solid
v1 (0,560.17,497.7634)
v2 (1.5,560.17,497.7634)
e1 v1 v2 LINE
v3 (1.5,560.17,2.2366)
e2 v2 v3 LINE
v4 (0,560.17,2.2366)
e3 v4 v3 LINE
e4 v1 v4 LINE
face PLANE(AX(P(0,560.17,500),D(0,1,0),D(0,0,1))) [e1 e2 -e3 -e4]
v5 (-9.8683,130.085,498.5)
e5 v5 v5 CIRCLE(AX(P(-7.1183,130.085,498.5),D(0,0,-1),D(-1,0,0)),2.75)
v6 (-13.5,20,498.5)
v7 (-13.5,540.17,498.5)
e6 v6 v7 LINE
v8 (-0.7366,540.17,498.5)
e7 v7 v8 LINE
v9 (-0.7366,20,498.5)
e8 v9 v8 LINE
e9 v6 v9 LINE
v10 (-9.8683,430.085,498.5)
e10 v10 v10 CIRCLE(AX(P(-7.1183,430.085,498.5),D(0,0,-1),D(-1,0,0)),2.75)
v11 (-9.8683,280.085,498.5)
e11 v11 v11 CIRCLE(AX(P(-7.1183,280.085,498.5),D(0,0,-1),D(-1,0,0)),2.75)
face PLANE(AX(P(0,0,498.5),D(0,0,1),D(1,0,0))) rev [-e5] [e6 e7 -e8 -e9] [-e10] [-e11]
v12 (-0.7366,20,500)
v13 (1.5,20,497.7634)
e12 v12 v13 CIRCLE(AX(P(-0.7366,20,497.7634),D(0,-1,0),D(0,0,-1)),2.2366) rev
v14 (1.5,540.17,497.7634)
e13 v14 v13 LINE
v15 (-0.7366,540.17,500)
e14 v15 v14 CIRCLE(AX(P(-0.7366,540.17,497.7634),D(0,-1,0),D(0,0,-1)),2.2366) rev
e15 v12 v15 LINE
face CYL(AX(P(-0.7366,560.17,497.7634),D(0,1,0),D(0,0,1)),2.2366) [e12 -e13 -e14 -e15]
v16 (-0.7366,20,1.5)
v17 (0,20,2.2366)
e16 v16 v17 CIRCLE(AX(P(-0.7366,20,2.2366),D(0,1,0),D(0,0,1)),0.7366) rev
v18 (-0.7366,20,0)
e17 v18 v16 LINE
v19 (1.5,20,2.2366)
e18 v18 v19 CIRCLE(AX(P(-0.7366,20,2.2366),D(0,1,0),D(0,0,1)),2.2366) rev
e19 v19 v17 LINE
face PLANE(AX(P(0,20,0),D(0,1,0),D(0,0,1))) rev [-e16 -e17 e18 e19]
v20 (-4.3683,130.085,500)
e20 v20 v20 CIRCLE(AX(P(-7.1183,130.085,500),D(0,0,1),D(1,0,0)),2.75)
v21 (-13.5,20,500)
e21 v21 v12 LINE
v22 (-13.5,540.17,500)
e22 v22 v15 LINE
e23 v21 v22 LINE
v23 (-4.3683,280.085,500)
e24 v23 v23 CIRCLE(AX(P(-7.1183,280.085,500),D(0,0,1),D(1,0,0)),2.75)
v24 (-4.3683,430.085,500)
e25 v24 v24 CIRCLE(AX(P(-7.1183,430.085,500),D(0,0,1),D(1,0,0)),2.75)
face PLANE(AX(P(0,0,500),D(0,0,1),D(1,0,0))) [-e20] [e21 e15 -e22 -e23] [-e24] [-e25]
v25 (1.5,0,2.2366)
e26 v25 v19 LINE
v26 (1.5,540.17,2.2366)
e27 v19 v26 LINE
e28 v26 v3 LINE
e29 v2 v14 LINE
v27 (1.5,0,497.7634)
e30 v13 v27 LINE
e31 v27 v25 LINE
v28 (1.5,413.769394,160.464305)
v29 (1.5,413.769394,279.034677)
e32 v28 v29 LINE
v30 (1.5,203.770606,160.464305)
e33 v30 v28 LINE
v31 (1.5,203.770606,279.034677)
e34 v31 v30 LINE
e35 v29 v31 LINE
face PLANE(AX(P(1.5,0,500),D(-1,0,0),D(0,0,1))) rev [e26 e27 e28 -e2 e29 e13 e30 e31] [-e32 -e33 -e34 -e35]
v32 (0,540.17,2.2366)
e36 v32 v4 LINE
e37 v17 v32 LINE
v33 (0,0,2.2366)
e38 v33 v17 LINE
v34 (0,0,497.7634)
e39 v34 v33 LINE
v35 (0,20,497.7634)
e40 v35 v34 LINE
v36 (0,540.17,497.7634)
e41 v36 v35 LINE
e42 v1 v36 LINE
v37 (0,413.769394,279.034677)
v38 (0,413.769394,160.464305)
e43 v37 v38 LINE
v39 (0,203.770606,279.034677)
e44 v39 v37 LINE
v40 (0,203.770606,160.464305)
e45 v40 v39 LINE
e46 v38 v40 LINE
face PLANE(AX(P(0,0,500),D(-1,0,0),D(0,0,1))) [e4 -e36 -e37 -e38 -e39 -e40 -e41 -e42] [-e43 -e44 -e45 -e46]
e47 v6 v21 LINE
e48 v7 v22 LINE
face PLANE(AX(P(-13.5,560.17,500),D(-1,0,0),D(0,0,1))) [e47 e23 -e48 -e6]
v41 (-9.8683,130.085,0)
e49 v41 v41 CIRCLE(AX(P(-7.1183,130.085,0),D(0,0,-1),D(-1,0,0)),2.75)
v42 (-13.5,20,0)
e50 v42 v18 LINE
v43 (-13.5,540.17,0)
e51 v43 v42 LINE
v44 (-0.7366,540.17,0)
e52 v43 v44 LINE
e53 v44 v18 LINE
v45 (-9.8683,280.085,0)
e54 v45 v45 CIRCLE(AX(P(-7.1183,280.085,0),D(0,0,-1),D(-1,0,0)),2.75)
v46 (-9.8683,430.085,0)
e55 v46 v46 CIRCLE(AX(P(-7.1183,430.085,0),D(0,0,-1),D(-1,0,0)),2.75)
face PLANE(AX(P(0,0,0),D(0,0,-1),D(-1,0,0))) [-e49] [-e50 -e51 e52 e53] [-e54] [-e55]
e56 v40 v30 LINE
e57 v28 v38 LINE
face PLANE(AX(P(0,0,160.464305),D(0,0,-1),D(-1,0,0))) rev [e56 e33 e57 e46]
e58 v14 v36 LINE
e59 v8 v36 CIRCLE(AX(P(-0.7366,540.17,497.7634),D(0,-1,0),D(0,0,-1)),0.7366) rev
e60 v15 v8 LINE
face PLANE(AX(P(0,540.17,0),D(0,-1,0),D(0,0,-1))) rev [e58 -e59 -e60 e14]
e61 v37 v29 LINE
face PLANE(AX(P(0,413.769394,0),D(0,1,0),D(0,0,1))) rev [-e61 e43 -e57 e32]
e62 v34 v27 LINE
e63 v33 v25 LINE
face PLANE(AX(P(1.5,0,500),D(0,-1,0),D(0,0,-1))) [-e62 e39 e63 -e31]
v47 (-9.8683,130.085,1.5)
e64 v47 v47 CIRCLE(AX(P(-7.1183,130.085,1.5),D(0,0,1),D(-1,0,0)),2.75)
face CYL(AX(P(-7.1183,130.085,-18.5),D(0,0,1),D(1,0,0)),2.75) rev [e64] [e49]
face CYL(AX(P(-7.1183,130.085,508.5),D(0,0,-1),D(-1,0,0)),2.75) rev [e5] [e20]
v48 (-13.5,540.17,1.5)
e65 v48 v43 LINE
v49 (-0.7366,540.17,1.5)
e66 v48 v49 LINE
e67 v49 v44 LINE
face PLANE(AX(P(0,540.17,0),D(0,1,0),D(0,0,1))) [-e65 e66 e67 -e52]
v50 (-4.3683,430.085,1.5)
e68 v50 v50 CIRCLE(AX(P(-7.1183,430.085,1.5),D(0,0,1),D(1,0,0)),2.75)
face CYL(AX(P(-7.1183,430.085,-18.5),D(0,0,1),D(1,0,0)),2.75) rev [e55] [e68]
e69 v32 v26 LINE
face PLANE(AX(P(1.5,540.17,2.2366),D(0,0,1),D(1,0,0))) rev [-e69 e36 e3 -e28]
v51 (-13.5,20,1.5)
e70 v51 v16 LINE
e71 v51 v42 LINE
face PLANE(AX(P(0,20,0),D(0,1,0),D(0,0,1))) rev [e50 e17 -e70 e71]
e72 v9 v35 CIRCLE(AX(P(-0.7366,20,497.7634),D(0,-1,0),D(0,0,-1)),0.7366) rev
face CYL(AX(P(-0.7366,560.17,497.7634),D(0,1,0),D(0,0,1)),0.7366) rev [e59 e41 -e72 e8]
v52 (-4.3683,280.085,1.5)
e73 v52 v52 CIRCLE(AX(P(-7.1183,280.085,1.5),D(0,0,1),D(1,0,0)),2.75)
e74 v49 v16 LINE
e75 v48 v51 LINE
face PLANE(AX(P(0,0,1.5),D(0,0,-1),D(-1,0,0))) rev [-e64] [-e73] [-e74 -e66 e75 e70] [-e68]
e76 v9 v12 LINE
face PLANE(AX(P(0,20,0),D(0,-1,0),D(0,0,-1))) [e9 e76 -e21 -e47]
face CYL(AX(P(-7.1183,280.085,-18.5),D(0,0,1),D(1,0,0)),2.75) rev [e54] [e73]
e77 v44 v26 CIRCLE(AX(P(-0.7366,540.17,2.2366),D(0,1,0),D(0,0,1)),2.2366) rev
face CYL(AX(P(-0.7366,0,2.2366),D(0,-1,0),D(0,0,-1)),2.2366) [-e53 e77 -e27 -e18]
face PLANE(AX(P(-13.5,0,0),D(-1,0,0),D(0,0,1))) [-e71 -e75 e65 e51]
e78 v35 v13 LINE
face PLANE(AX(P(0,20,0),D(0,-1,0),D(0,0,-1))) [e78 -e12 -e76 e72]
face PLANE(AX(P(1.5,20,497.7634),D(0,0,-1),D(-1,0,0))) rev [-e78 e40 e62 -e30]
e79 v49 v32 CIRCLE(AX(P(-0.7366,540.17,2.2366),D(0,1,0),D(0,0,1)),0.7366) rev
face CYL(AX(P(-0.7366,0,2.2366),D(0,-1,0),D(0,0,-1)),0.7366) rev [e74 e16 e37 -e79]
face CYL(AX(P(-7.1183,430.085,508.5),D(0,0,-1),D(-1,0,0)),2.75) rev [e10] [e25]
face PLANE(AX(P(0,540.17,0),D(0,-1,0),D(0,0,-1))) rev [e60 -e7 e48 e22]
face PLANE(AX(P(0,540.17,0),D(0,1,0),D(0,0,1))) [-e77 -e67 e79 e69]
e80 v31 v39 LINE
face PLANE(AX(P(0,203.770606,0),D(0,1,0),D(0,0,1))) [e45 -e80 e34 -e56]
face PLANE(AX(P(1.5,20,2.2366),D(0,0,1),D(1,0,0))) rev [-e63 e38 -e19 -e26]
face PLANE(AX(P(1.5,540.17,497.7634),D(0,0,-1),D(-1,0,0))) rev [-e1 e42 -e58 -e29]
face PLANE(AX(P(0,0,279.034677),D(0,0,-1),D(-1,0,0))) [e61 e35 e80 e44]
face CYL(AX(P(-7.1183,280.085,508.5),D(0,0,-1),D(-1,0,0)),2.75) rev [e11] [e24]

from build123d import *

# Parameters (mm, degrees)
SKETCH_1_W                       = 1.5
SKETCH_1_H                       = 560.17
SM_BASE_FLANGE_1_DEPTH           = 500
SKETCH_6_W                       = 317.570371398
SKETCH_6_H                       = 336.908787646
CUT_EXTRUDE_1_DEPTH              = 10
SKETCH_7_W                       = 1.5
SKETCH_7_H                       = 317.570371398
EXTRUDE_1_DEPTH                  = 34.77
SKETCH_8_W                       = 1.5
SKETCH_8_H                       = 317.570371398
EXTRUDE_2_DEPTH                  = 92.14
SKETCH_9_W                       = 1.5
SKETCH_9_H                       = 209.998787646
EXTRUDE_3_DEPTH                  = 126
SKETCH_10_W                      = 1.5
SKETCH_10_H                      = 209.998787646
EXTRUDE_4_DEPTH                  = 73
SM_EDGE_FLANGE_1_STRIP_W         = 7.4732
SM_EDGE_FLANGE_1_STRIP_H         = 1.5
SM_EDGE_FLANGE_1_STRIP_CUT_DEPTH = 560.17
SM_EDGE_FLANGE_1_DEPTH           = 560.17
SM_EDGE_FLANGE_2_STRIP_W         = 7.4732
SM_EDGE_FLANGE_2_STRIP_H         = 1.5
SM_EDGE_FLANGE_2_STRIP_CUT_DEPTH = 560.17
SM_EDGE_FLANGE_2_DEPTH           = 560.17
SKETCH_19_W                      = 22.446307896
SKETCH_19_H                      = 4.345643328
SKETCH_19_H_2                    = 10.457116237
CUT_EXTRUDE_2_DEPTH              = 20
SKETCH_20_W                      = 19.209439619
SKETCH_20_H                      = 11.495536561
SKETCH_20_W_2                    = 27.208670792
SKETCH_20_H_2                    = 7.195465163
CUT_EXTRUDE_3_DEPTH              = 20
SKETCH_21_R                      = 2.75
CUT_EXTRUDE_4_DEPTH              = 20
CUT_EXTRUDE_START                = -10
SKETCH_22_R                      = 2.75
CUT_EXTRUDE_5_DEPTH              = 10


# Sheet-metal steps are written as plain solids
with BuildPart() as part:
    # Sketch 1 → 基体-法兰1 (new body)
    with BuildSketch(Plane.XY):
        with Locations((0.75, 280.085)):
            Rectangle(SKETCH_1_W, SKETCH_1_H)
    extrude(amount=SM_BASE_FLANGE_1_DEPTH)

    # 草图6 → 切除-拉伸1 (cut)
    with BuildSketch(Plane(origin=(1.5, 0, 0), x_dir=(0, 0, -1), z_dir=(1, 0, 0))):
        with Locations((-246.249491055, 280.085)):
            Rectangle(SKETCH_6_W, SKETCH_6_H)
    extrude(amount=-CUT_EXTRUDE_1_DEPTH, mode=Mode.SUBTRACT)

    # 草图7 → 凸台-拉伸1 (add)
    with BuildSketch(Plane.XZ.offset(-448.539393823)):
        with Locations((0.75, 246.249491055)):
            Rectangle(SKETCH_7_W, SKETCH_7_H)
    extrude(amount=EXTRUDE_1_DEPTH)

    # 草图8 → 凸台-拉伸2 (add)
    with BuildSketch(Plane(origin=(0, 111.630606177, 0), x_dir=(1, 0, 0), z_dir=(0, 1, 0))):
        with Locations((0.75, -246.249491055)):
            Rectangle(SKETCH_8_W, SKETCH_8_H)
    extrude(amount=EXTRUDE_2_DEPTH)

    # 草图9 → 凸台-拉伸3 (add)
    with BuildSketch(Plane(origin=(0, 0, 405.034676754), x_dir=(-1, 0, 0), z_dir=(0, 0, -1))):
        with Locations((-0.75, 308.77)):
            Rectangle(SKETCH_9_W, SKETCH_9_H)
    extrude(amount=EXTRUDE_3_DEPTH)

    # 草图10 → 凸台-拉伸4 (add)
    with BuildSketch(Plane.XY.offset(87.464305356)):
        with Locations((0.75, 308.77)):
            Rectangle(SKETCH_10_W, SKETCH_10_H)
    extrude(amount=EXTRUDE_4_DEPTH)

    # 边线-法兰1 strip (across the edge) → 边线-法兰1 strip cut (cut)
    with BuildSketch(Plane(origin=(0, 0, 500), x_dir=(0, 0, -1), z_dir=(0, 1, 0))):
        with Locations((-1.5, -0.75)):
            Rectangle(SM_EDGE_FLANGE_1_STRIP_W, SM_EDGE_FLANGE_1_STRIP_H)
    extrude(amount=SM_EDGE_FLANGE_1_STRIP_CUT_DEPTH, mode=Mode.SUBTRACT)

    # 边线-法兰1 section (across the edge) → 边线-法兰1 (add)
    with BuildSketch(Plane(origin=(0, 0, 500), x_dir=(0, 0, -1), z_dir=(0, 1, 0))):
        with BuildLine():
            Line((0, 0.7366), (0, 13.5))
            Line((0, 13.5), (1.5, 13.5))
            Line((1.5, 13.5), (1.5, 0.7366))
            ThreePointArc((1.5, 0.7366), (1.715745145, 0.215745145), (2.2366, 0))
            Line((2.2366, 0), (2.2366, -1.5))
            ThreePointArc((2.2366, -1.5), (0.655084973, -0.844915027), (0, 0.7366))
        make_face()
    extrude(amount=SM_EDGE_FLANGE_1_DEPTH)

    # 边线-法兰2 strip (across the edge) → 边线-法兰2 strip cut (cut)
    with BuildSketch(Plane(origin=(0, 560.17, 0), x_dir=(0, 0, 1), z_dir=(0, -1, 0))):
        with Locations((-1.5, -0.75)):
            Rectangle(SM_EDGE_FLANGE_2_STRIP_W, SM_EDGE_FLANGE_2_STRIP_H)
    extrude(amount=SM_EDGE_FLANGE_2_STRIP_CUT_DEPTH, mode=Mode.SUBTRACT)

    # 边线-法兰2 section (across the edge) → 边线-法兰2 (add)
    with BuildSketch(Plane(origin=(0, 560.17, 0), x_dir=(0, 0, 1), z_dir=(0, -1, 0))):
        with BuildLine():
            Line((0, 0.7366), (0, 13.5))
            Line((0, 13.5), (1.5, 13.5))
            Line((1.5, 13.5), (1.5, 0.7366))
            ThreePointArc((1.5, 0.7366), (1.715745145, 0.215745145), (2.2366, 0))
            Line((2.2366, 0), (2.2366, -1.5))
            ThreePointArc((2.2366, -1.5), (0.655084973, -0.844915027), (0, 0.7366))
        make_face()
    extrude(amount=SM_EDGE_FLANGE_2_DEPTH)

    # 草图19 → 切除-拉伸2 (cut)
    with BuildSketch(Plane.XZ):
        with Locations((-9.723153948, 0.063778336)):
            Rectangle(SKETCH_19_W, SKETCH_19_H)
        with Locations((-9.723153948, 502.991958119)):
            Rectangle(SKETCH_19_W, SKETCH_19_H_2)
    extrude(amount=-CUT_EXTRUDE_2_DEPTH, mode=Mode.SUBTRACT)

    # 草图20 → 切除-拉伸3 (cut)
    with BuildSketch(Plane(origin=(0, 560.17, 0), x_dir=(1, 0, 0), z_dir=(0, 1, 0))):
        with Locations((-8.10471981, -503.511168281)):
            Rectangle(SKETCH_20_W, SKETCH_20_H)
        with Locations((-12.104335396, 1.361132582)):
            Rectangle(SKETCH_20_W_2, SKETCH_20_H_2)
    extrude(amount=-CUT_EXTRUDE_3_DEPTH, mode=Mode.SUBTRACT)

    # 草图21 → 切除-拉伸4 (cut)
    with BuildSketch(Plane.XY.offset(1.5)):
        with Locations((-7.1183, 430.085)):
            Circle(SKETCH_21_R)
        with Locations((-7.1183, 280.085)):
            Circle(SKETCH_21_R)
        with Locations(Location((-7.1183, 130.085, 0), (0, 0, 180))):
            Circle(SKETCH_21_R)
    extrude(amount=-CUT_EXTRUDE_4_DEPTH, mode=Mode.SUBTRACT)

    # 草图22 → 切除-拉伸5 (cut)
    with BuildSketch(Plane(origin=(0, 0, 498.5), x_dir=(-1, 0, 0), z_dir=(0, 0, -1)).offset(CUT_EXTRUDE_START)):
        with Locations(Location((7.1183, 430.085, 0), (0, 0, 180))):
            Circle(SKETCH_22_R)
        with Locations(Location((7.1183, 280.085, 0), (0, 0, 180))):
            Circle(SKETCH_22_R)
        with Locations((7.1183, 130.085)):
            Circle(SKETCH_22_R)
    extrude(amount=CUT_EXTRUDE_5_DEPTH, mode=Mode.SUBTRACT)


solid = part.part
